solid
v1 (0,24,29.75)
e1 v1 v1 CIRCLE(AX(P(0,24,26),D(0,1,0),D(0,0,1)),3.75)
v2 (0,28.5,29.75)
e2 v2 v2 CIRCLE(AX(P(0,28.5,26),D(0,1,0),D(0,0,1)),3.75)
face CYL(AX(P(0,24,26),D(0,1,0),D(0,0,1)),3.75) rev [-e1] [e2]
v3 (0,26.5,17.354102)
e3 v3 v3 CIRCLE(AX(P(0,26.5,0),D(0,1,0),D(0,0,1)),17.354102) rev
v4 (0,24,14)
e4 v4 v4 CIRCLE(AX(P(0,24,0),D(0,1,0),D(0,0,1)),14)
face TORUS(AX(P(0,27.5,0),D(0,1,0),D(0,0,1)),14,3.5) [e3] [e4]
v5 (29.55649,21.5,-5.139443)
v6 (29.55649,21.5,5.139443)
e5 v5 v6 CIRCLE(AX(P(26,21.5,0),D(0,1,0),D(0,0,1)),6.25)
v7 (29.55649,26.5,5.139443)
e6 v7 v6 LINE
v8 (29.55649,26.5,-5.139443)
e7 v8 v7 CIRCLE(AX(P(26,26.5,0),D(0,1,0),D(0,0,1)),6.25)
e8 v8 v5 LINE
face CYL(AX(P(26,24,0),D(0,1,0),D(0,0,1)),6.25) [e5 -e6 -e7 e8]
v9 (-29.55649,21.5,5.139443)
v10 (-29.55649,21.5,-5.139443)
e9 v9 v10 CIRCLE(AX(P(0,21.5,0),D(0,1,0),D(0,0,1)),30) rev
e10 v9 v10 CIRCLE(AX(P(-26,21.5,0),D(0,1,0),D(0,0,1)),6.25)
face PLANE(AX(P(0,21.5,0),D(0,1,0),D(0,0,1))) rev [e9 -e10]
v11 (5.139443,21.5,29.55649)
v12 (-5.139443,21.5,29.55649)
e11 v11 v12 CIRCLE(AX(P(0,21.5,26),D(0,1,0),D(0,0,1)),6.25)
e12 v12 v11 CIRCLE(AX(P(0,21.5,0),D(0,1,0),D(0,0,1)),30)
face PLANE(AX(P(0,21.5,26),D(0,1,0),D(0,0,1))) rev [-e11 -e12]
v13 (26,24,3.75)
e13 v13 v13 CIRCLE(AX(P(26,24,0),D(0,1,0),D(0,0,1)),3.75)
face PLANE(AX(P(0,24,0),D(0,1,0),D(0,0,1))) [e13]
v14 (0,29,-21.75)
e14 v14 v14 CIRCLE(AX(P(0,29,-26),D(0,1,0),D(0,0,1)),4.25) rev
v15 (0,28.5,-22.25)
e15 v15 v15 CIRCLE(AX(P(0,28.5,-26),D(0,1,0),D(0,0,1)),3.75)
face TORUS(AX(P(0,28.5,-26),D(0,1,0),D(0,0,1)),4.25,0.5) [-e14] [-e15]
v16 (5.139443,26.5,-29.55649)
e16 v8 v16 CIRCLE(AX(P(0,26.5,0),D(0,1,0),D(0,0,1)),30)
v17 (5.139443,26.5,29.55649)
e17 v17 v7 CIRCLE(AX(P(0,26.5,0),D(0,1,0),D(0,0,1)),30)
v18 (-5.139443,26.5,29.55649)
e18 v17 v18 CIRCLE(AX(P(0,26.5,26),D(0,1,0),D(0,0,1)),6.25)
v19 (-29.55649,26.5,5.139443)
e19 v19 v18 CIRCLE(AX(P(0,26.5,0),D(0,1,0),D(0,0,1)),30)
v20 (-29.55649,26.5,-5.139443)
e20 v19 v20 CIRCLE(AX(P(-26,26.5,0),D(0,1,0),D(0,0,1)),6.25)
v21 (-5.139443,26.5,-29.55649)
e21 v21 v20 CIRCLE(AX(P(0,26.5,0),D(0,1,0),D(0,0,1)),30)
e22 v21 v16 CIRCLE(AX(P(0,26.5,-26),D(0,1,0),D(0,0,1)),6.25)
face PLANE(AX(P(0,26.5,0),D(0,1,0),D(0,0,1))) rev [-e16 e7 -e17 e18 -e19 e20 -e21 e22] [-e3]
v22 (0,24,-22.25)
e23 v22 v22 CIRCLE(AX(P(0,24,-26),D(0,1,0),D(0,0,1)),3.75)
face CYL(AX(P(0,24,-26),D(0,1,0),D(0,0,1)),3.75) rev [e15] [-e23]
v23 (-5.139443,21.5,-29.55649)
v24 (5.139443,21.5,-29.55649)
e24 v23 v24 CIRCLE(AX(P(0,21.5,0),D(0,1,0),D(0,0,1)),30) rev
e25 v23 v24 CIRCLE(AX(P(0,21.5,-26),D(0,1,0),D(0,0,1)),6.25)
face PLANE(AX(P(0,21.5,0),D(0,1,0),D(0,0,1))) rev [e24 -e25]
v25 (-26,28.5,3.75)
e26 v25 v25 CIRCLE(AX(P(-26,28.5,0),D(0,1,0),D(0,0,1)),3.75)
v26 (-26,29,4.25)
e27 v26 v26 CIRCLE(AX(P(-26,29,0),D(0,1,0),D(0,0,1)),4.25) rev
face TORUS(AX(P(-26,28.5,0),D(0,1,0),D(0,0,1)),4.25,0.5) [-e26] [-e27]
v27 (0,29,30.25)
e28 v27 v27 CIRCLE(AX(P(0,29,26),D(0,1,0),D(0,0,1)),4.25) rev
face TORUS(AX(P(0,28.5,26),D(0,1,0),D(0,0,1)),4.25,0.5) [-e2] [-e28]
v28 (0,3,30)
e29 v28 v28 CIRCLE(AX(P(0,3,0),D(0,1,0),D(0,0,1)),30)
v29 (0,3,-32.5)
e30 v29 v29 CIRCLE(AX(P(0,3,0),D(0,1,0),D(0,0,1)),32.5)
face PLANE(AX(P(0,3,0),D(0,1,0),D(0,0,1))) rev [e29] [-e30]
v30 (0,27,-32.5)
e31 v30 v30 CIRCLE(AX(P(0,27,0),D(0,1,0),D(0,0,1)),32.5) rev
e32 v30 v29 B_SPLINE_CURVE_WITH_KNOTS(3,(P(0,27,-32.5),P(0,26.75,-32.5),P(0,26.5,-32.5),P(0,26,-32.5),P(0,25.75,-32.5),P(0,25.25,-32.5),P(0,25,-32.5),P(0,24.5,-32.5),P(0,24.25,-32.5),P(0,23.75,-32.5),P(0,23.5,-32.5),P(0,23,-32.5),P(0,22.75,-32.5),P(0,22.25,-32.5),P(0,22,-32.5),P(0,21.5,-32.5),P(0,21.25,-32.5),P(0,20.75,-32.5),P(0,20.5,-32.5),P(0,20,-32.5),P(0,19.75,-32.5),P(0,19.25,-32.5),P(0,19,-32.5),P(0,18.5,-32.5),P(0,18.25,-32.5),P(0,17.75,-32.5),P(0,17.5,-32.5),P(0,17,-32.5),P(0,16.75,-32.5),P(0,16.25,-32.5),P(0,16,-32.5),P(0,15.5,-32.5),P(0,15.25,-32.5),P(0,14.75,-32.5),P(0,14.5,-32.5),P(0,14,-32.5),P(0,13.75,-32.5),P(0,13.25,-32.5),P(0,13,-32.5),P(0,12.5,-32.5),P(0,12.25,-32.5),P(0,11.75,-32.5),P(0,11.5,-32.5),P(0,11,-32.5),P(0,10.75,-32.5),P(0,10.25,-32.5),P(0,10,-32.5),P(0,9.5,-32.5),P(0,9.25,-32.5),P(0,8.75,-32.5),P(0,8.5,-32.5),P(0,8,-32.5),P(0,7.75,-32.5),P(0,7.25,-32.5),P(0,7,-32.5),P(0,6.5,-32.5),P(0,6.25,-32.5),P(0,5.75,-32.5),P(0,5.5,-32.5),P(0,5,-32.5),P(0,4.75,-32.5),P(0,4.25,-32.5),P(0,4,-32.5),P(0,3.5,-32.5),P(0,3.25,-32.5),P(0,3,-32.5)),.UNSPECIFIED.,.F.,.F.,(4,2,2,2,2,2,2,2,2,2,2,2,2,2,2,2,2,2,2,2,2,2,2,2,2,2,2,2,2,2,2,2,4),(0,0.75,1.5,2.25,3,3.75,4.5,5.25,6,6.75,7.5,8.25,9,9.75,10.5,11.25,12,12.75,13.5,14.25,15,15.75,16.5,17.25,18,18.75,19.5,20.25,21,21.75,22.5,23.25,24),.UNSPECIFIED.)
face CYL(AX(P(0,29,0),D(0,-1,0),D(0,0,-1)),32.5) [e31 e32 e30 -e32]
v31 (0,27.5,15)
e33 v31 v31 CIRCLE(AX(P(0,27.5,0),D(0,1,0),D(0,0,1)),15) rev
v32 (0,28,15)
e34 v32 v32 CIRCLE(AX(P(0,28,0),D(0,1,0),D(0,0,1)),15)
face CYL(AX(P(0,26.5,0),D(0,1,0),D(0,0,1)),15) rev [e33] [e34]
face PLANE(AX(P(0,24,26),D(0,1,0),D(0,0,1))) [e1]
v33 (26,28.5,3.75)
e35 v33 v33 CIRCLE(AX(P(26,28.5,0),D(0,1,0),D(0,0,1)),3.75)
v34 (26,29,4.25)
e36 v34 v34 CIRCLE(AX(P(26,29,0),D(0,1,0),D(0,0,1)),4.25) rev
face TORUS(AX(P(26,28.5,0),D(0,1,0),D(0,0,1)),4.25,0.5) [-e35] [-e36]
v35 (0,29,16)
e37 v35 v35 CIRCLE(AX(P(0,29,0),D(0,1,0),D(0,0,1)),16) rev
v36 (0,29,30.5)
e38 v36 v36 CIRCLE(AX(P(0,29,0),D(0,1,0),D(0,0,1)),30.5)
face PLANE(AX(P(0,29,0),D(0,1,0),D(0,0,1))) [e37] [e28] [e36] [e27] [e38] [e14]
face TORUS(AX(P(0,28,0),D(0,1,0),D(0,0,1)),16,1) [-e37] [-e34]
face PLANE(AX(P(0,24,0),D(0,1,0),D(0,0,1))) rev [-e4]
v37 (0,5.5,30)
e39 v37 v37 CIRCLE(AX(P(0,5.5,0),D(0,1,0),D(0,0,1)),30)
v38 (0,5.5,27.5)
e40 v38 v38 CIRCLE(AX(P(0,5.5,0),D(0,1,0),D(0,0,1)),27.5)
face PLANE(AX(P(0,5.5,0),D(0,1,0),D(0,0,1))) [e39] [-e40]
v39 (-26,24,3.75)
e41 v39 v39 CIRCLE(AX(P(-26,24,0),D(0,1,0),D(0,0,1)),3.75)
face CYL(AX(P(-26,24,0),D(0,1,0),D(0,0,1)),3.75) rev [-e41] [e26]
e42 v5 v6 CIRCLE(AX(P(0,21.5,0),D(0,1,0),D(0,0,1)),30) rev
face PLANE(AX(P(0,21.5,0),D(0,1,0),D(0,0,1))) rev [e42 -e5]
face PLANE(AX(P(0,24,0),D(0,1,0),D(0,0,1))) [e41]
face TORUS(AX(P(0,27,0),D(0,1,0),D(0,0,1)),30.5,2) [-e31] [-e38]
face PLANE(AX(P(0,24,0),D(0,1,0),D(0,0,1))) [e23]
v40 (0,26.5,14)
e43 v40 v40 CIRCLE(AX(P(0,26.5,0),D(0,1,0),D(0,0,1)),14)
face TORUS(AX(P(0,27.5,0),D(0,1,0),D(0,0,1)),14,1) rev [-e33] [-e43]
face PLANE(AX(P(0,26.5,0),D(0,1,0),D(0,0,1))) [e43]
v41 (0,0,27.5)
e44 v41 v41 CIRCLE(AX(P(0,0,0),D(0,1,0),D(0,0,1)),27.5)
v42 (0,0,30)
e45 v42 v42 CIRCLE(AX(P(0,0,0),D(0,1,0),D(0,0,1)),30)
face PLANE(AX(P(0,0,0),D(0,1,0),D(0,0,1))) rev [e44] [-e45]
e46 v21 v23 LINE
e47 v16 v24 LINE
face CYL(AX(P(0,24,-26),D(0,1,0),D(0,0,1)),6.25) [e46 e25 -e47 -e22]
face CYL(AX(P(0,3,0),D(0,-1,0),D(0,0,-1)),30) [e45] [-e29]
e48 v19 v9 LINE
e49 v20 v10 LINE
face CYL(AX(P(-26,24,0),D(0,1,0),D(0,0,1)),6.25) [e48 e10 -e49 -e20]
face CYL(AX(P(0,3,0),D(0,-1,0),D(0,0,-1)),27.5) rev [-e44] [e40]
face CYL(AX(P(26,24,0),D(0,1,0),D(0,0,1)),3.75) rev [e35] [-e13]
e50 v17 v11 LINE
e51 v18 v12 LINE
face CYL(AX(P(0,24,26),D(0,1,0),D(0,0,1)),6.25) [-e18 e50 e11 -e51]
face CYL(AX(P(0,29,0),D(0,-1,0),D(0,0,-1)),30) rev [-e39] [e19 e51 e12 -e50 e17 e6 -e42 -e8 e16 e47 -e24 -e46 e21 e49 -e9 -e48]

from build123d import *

# Parameters (mm, degrees)
SKETCH2_R           = 30
BOSS_EXTRUDE1_DEPTH = 3
SKETCH3_R           = 32.5
BOSS_EXTRUDE2_DEPTH = 26
SKETCH4_R           = 15
CUT_EXTRUDE1_DEPTH  = 2.5
SKETCH4_3_R         = 3.75
CUT_EXTRUDE2_DEPTH  = 5
FILLET1_R           = 1
FILLET2_R           = 1
FILLET3_R           = 2
FILLET4_R           = 0.5
SHELL1_OUTLINE_R    = 27.5
SHELL1_DEPTH        = 21.5
SHELL1_START        = 5.5
SHELL1_2_DEPTH      = 18.5
SHELL1_3_DEPTH      = 16
SHELL1_START_2      = 24
SHELL1_4_DEPTH      = 2.5
SHELL1_6_OUTLINE_R  = 17.354101966
SHELL1_6_DEPTH      = 2.5


with BuildPart() as part:
    # Sketch2 → Boss-Extrude1 (new body)
    with BuildSketch(Plane(origin=(0, 0, 0), x_dir=(1, 0, 0), z_dir=(0, 1, 0))):
        with Locations(Location((0, 0, 0), (0, 0, 270))):
            Circle(SKETCH2_R)
    extrude(amount=BOSS_EXTRUDE1_DEPTH)

    # Sketch3 → Boss-Extrude2 (add)
    with BuildSketch(Plane(origin=(0, 3, 0), x_dir=(1, 0, 0), z_dir=(0, 1, 0))):
        with Locations(Location((0, 0, 0), (0, 0, 90))):
            Circle(SKETCH3_R)
    extrude(amount=BOSS_EXTRUDE2_DEPTH)

    # Sketch4 → Cut-Extrude1 (cut)
    with BuildSketch(Plane(origin=(0, 29, 0), x_dir=(1, 0, 0), z_dir=(0, 1, 0))):
        with Locations(Location((0, 0, 0), (0, 0, 270))):
            Circle(SKETCH4_R)
    extrude(amount=-CUT_EXTRUDE1_DEPTH, mode=Mode.SUBTRACT)

    # Sketch4<3> → Cut-Extrude2 (cut)
    with BuildSketch(Plane(origin=(0, 29, 0), x_dir=(1, 0, 0), z_dir=(0, 1, 0))):
        with Locations(Location((0, 26, 0), (0, 0, 270))):
            Circle(SKETCH4_3_R)
        with Locations(Location((26, 0, 0), (0, 0, 270))):
            Circle(SKETCH4_3_R)
        with Locations(Location((0, -26, 0), (0, 0, 270))):
            Circle(SKETCH4_3_R)
        with Locations(Location((-26, 0, 0), (0, 0, 270))):
            Circle(SKETCH4_3_R)
    extrude(amount=-CUT_EXTRUDE2_DEPTH, mode=Mode.SUBTRACT)

    # Fillet1
    fillet1_edges = [part.edges().sort_by_distance(p)[0] for p in [
        (0, 26.5, -15),
    ]]
    fillet(fillet1_edges, radius=FILLET1_R)

    # Fillet2
    fillet2_edges = [part.edges().sort_by_distance(p)[0] for p in [
        (0, 29, -15),
    ]]
    fillet(fillet2_edges, radius=FILLET2_R)

    # Fillet3
    fillet3_edges = [part.edges().sort_by_distance(p)[0] for p in [
        (0, 29, 32.5),
    ]]
    fillet(fillet3_edges, radius=FILLET3_R)

    # Fillet4
    fillet4_edges = [part.edges().sort_by_distance(p)[0] for p in [
        (-26, 29, -3.75),
        (0, 29, -29.75),
        (26, 29, -3.75),
        (0, 29, 22.25),
    ]]
    fillet(fillet4_edges, radius=FILLET4_R)

    # Shell1: read off the stored shape, not the designer's step
    # Shell1 outline → Shell1 (cut)
    with BuildSketch(Plane(origin=(0, 0, 0), x_dir=(1, 0, 0), z_dir=(0, 1, 0))):
        Circle(SHELL1_OUTLINE_R)
    extrude(amount=SHELL1_DEPTH, mode=Mode.SUBTRACT)

    # Shell1 2 outline → Shell1 2 (cut)
    with BuildSketch(Plane(origin=(0, 0, 0), x_dir=(1, 0, 0), z_dir=(0, 1, 0)).offset(SHELL1_START)):
        with BuildLine():
            ThreePointArc((29.556490385, 5.139443175), (21.213203436, 21.213203436), (5.139443175, 29.556490385))
            ThreePointArc((5.139443175, 29.556490385), (0, 19.75), (-5.139443175, 29.556490385))
            ThreePointArc((-5.139443175, 29.556490385), (-21.213203436, 21.213203436), (-29.556490385, 5.139443175))
            ThreePointArc((-29.556490385, 5.139443175), (-19.75, 0), (-29.556490385, -5.139443175))
            ThreePointArc((-29.556490385, -5.139443175), (-21.213203436, -21.213203436), (-5.139443175, -29.556490385))
            ThreePointArc((-5.139443175, -29.556490385), (0, -19.75), (5.139443175, -29.556490385))
            ThreePointArc((5.139443175, -29.556490385), (21.213203436, -21.213203436), (29.556490385, -5.139443175))
            ThreePointArc((29.556490385, -5.139443175), (19.75, 0), (29.556490385, 5.139443175))
        make_face()
    extrude(amount=SHELL1_2_DEPTH, mode=Mode.SUBTRACT)

    # Shell1 3 outline → Shell1 3 (cut)
    with BuildSketch(Plane(origin=(0, 0, 0), x_dir=(1, 0, 0), z_dir=(0, 1, 0)).offset(SHELL1_START)):
        with BuildLine():
            ThreePointArc((29.556490385, -5.139443175), (30, 0), (29.556490385, 5.139443175))
            ThreePointArc((29.556490385, 5.139443175), (28.237962341, 5.835582624), (26.792067308, 6.199607196))
            ThreePointArc((26.792067308, 6.199607196), (27.5, 0), (26.792067308, -6.199607196))
            ThreePointArc((26.792067308, -6.199607196), (28.237962341, -5.835582624), (29.556490385, -5.139443175))
        make_face()
        with BuildLine():
            ThreePointArc((6.199607196, 26.792067308), (5.835582624, 28.237962341), (5.139443175, 29.556490385))
            ThreePointArc((5.139443175, 29.556490385), (0, 30), (-5.139443175, 29.556490385))
            ThreePointArc((-5.139443175, 29.556490385), (-5.835582624, 28.237962341), (-6.199607196, 26.792067308))
            ThreePointArc((-6.199607196, 26.792067308), (0, 27.5), (6.199607196, 26.792067308))
        make_face()
        with BuildLine():
            ThreePointArc((-5.139443175, -29.556490385), (0, -30), (5.139443175, -29.556490385))
            ThreePointArc((5.139443175, -29.556490385), (5.835582624, -28.237962341), (6.199607196, -26.792067308))
            ThreePointArc((6.199607196, -26.792067308), (0, -27.5), (-6.199607196, -26.792067308))
            ThreePointArc((-6.199607196, -26.792067308), (-5.835582624, -28.237962341), (-5.139443175, -29.556490385))
        make_face()
        with BuildLine():
            ThreePointArc((-26.792067308, 6.199607196), (-28.237962341, 5.835582624), (-29.556490385, 5.139443175))
            ThreePointArc((-29.556490385, 5.139443175), (-30, 0), (-29.556490385, -5.139443175))
            ThreePointArc((-29.556490385, -5.139443175), (-28.237962341, -5.835582624), (-26.792067308, -6.199607196))
            ThreePointArc((-26.792067308, -6.199607196), (-27.5, 0), (-26.792067308, 6.199607196))
        make_face()
    extrude(amount=SHELL1_3_DEPTH, mode=Mode.SUBTRACT)

    # Shell1 4 outline → Shell1 4 (cut)
    with BuildSketch(Plane(origin=(0, 0, 0), x_dir=(1, 0, 0), z_dir=(0, 1, 0)).offset(SHELL1_START_2)):
        with BuildLine():
            ThreePointArc((26.792067308, 6.199607196), (28.237962341, 5.835582624), (29.556490385, 5.139443175))
            ThreePointArc((29.556490385, 5.139443175), (21.213203436, 21.213203436), (5.139443175, 29.556490385))
            ThreePointArc((5.139443175, 29.556490385), (5.835582624, 28.237962341), (6.199607196, 26.792067308))
            ThreePointArc((6.199607196, 26.792067308), (19.445436483, 19.445436483), (26.792067308, 6.199607196))
        make_face()
        with BuildLine():
            ThreePointArc((5.139443175, -29.556490385), (21.213203436, -21.213203436), (29.556490385, -5.139443175))
            ThreePointArc((29.556490385, -5.139443175), (28.237962341, -5.835582624), (26.792067308, -6.199607196))
            ThreePointArc((26.792067308, -6.199607196), (19.445436483, -19.445436483), (6.199607196, -26.792067308))
            ThreePointArc((6.199607196, -26.792067308), (5.835582624, -28.237962341), (5.139443175, -29.556490385))
        make_face()
        with BuildLine():
            ThreePointArc((-6.199607196, 26.792067308), (-5.835582624, 28.237962341), (-5.139443175, 29.556490385))
            ThreePointArc((-5.139443175, 29.556490385), (-21.213203436, 21.213203436), (-29.556490385, 5.139443175))
            ThreePointArc((-29.556490385, 5.139443175), (-28.237962341, 5.835582624), (-26.792067308, 6.199607196))
            ThreePointArc((-26.792067308, 6.199607196), (-19.445436483, 19.445436483), (-6.199607196, 26.792067308))
        make_face()
        with BuildLine():
            ThreePointArc((-29.556490385, -5.139443175), (-21.213203436, -21.213203436), (-5.139443175, -29.556490385))
            ThreePointArc((-5.139443175, -29.556490385), (-5.835582624, -28.237962341), (-6.199607196, -26.792067308))
            ThreePointArc((-6.199607196, -26.792067308), (-19.445436483, -19.445436483), (-26.792067308, -6.199607196))
            ThreePointArc((-26.792067308, -6.199607196), (-28.237962341, -5.835582624), (-29.556490385, -5.139443175))
        make_face()
    extrude(amount=SHELL1_4_DEPTH, mode=Mode.SUBTRACT)

    # Shell1 5 outline → Shell1 5 (revolve, cut)
    with BuildSketch(Plane.XY):
        with BuildLine():
            ThreePointArc((17.354101966, 26.5), (16.091650066, 24.69375696), (14, 24))
            Line((14, 24), (17.354101966, 24))
            Line((17.354101966, 24), (17.354101966, 26.5))
        make_face()
    revolve(axis=Axis((0, 0, 0), (0, 1, 0)), mode=Mode.SUBTRACT)

    # Shell1 6 outline → Shell1 6 (cut)
    with BuildSketch(Plane(origin=(0, 0, 0), x_dir=(1, 0, 0), z_dir=(0, 1, 0)).offset(SHELL1_START_2)):
        with BuildLine():
            ThreePointArc((-26.792067308, 6.199607196), (-19.75, 0), (-26.792067308, -6.199607196))
            ThreePointArc((-26.792067308, -6.199607196), (-19.445436483, -19.445436483), (-6.199607196, -26.792067308))
            ThreePointArc((-6.199607196, -26.792067308), (0, -19.75), (6.199607196, -26.792067308))
            ThreePointArc((6.199607196, -26.792067308), (19.445436483, -19.445436483), (26.792067308, -6.199607196))
            ThreePointArc((26.792067308, -6.199607196), (19.75, 0), (26.792067308, 6.199607196))
            ThreePointArc((26.792067308, 6.199607196), (19.445436483, 19.445436483), (6.199607196, 26.792067308))
            ThreePointArc((6.199607196, 26.792067308), (0, 19.75), (-6.199607196, 26.792067308))
            ThreePointArc((-6.199607196, 26.792067308), (-19.445436483, 19.445436483), (-26.792067308, 6.199607196))
        make_face()
        Circle(SHELL1_6_OUTLINE_R, mode=Mode.SUBTRACT)
    extrude(amount=SHELL1_6_DEPTH, mode=Mode.SUBTRACT)


solid = part.part
